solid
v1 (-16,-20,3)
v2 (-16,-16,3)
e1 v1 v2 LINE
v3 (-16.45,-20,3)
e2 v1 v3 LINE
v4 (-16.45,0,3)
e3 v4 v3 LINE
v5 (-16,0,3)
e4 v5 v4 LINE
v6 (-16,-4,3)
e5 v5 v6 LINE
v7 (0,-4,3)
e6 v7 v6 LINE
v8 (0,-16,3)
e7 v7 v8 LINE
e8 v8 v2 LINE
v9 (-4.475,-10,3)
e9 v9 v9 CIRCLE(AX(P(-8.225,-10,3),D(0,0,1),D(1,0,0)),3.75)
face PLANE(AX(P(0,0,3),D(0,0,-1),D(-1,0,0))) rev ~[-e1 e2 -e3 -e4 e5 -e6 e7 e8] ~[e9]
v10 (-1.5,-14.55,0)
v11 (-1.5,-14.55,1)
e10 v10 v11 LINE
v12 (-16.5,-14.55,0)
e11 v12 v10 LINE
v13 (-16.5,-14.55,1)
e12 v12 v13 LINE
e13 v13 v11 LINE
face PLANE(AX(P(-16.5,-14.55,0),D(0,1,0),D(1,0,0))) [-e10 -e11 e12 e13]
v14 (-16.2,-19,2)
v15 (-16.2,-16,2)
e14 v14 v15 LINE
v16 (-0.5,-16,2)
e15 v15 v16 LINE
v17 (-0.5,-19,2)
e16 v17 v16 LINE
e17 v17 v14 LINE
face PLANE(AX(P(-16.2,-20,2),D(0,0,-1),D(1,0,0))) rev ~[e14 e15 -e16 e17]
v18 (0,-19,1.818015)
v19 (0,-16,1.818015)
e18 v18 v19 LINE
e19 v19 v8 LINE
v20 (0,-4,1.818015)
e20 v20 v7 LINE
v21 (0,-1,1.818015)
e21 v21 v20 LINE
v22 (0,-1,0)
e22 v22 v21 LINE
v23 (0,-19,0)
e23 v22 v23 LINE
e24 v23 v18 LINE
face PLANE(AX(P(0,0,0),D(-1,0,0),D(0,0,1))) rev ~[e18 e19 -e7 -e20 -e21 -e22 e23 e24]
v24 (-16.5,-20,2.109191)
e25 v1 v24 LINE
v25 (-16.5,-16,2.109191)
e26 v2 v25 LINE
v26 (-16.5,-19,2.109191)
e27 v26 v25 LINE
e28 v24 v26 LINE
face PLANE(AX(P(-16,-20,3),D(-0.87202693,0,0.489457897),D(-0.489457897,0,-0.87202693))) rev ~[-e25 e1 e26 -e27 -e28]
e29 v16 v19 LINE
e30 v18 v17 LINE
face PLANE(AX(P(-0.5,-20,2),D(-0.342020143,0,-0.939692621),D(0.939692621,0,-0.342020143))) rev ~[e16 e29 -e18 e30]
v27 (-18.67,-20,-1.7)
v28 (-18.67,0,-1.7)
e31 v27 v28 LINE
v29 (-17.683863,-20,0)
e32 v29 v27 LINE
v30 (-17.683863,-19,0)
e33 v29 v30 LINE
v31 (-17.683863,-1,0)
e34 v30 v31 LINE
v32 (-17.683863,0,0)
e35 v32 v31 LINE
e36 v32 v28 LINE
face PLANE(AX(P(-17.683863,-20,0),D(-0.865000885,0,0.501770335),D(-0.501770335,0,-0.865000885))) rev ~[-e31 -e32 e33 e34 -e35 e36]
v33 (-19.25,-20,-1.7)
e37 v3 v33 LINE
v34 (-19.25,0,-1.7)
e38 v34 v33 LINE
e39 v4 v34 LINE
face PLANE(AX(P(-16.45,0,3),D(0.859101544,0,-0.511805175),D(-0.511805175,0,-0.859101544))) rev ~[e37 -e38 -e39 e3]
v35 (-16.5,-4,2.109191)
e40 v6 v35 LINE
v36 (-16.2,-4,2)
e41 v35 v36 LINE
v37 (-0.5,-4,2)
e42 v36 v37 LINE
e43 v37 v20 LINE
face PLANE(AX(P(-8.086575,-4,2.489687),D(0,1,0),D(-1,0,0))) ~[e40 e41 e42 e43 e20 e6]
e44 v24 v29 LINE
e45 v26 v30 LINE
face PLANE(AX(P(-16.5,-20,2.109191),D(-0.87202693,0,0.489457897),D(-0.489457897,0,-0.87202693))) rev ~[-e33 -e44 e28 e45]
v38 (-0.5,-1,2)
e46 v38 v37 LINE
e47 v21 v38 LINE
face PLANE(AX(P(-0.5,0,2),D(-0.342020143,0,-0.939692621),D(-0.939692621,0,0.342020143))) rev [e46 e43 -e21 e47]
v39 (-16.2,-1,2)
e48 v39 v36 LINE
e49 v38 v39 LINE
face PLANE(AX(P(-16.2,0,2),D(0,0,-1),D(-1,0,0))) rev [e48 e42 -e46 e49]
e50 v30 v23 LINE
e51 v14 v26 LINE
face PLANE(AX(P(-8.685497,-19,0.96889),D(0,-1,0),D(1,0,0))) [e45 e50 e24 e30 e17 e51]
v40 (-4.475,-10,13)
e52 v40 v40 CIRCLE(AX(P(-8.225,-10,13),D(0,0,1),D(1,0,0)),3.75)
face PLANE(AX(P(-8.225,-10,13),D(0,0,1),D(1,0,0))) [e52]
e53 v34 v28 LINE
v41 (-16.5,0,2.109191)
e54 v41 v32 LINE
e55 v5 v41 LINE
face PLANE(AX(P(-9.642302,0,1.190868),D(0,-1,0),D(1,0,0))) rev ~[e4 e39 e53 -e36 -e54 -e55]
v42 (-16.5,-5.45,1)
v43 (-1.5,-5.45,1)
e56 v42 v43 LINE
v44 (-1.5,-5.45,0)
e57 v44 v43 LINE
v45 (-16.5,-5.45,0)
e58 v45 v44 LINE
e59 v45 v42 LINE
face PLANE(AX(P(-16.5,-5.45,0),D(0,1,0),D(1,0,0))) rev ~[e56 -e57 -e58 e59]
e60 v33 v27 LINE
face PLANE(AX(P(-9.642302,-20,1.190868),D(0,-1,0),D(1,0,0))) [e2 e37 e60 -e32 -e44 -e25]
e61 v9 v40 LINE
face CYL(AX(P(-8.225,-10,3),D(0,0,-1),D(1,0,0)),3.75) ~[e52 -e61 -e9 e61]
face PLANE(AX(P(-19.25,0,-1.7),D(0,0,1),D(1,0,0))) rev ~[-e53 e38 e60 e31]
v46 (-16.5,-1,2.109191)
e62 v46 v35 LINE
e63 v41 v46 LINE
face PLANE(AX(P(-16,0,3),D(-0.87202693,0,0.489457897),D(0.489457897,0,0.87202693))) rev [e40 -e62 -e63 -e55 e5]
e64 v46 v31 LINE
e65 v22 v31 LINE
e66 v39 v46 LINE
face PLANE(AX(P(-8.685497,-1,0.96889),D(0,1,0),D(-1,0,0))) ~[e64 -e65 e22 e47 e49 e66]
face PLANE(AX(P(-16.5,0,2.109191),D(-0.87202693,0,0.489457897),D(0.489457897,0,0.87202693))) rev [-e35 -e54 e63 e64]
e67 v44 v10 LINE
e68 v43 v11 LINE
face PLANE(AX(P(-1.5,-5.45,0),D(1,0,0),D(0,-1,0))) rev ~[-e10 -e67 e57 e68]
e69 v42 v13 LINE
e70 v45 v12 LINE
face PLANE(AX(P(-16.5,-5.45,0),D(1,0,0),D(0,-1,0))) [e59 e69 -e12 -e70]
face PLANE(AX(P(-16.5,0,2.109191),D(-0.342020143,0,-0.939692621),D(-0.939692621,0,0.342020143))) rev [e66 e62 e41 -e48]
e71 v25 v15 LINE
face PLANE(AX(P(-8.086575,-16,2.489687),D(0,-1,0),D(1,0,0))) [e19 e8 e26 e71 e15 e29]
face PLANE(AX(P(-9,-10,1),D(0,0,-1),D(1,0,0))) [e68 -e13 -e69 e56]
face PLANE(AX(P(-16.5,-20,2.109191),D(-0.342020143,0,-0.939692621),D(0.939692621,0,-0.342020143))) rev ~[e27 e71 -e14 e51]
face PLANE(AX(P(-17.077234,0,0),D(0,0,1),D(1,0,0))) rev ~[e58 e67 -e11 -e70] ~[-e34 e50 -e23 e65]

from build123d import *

# Parameters (mm, degrees)
F1_DEPTH  = 20
F3_DEPTH  = 4
F5_DEPTH  = 1
F7_DEPTH  = 20.001
F10_W     = 15
F10_H     = 9.1
F11_DEPTH = 1
F8_R      = 3.75
F12_DEPTH = 10


# Not quite as in the source:
# - a pattern or mirror of a feature is missing from the dataset's text; its kind, count and spacing are read off the source's solid


with BuildPart() as f1:
    # F0 (on Front) → F1 (new body)
    with BuildSketch(Plane.XZ):
        Polygon((-16.45, 3), (-19.25, -1.7), (-18.09, -1.7), (-17.0772340426, 0), (0, 0), (0, 3), align=None)
    extrude(amount=F1_DEPTH)

    # F2 (on face) → F3 (cut)
    with BuildSketch(Plane.XZ.offset(20)):
        Polygon((-16.2, 2), (-0.5, 2), (0, 1.8180148829), (0, 3), (-16, 3), (-16.5, 2.1091910703), align=None)
    f3 = extrude(amount=-F3_DEPTH, mode=Mode.SUBTRACT)

    # F3_copies: F3 across plane
    add(f3.mirror(Plane.ZX.offset(-10)), mode=Mode.SUBTRACT)

    # F4 (on face) → F5 (cut)
    with BuildSketch(Plane.XZ.offset(20)):
        Polygon((0, 0), (0, 1.8180148829), (-0.5, 2), (-16.2, 2), (-16.5, 2.1091910703), (-17.683862779, 0), align=None)
    f5 = extrude(amount=-F5_DEPTH, mode=Mode.SUBTRACT)

    # F5_copies: F5 across plane
    add(f5.mirror(Plane.ZX.offset(-10)), mode=Mode.SUBTRACT)

    # F6 (on face) → F7 (cut, through all)
    with BuildSketch(Plane.XZ.offset(20)):
        Polygon((-18.67, -1.7), (-18.09, -1.7), (-17.0772340426, 0), (-17.683862779, 0), align=None)
    extrude(amount=-F7_DEPTH, mode=Mode.SUBTRACT)

    # F10 (on face) → F11 (cut)
    with BuildSketch(Plane(origin=(0, 0, 0), x_dir=(1, 0, 0), z_dir=(0, 0, -1))):
        with Locations((-9, 10)):
            Rectangle(F10_W, F10_H)
    extrude(amount=-F11_DEPTH, mode=Mode.SUBTRACT)

    # F8 (on face) → F12 (join)
    with BuildSketch(Plane.XY.offset(3)):
        with Locations((-8.225, -10)):
            Circle(F8_R)
    extrude(amount=F12_DEPTH)


solid = f1.part
